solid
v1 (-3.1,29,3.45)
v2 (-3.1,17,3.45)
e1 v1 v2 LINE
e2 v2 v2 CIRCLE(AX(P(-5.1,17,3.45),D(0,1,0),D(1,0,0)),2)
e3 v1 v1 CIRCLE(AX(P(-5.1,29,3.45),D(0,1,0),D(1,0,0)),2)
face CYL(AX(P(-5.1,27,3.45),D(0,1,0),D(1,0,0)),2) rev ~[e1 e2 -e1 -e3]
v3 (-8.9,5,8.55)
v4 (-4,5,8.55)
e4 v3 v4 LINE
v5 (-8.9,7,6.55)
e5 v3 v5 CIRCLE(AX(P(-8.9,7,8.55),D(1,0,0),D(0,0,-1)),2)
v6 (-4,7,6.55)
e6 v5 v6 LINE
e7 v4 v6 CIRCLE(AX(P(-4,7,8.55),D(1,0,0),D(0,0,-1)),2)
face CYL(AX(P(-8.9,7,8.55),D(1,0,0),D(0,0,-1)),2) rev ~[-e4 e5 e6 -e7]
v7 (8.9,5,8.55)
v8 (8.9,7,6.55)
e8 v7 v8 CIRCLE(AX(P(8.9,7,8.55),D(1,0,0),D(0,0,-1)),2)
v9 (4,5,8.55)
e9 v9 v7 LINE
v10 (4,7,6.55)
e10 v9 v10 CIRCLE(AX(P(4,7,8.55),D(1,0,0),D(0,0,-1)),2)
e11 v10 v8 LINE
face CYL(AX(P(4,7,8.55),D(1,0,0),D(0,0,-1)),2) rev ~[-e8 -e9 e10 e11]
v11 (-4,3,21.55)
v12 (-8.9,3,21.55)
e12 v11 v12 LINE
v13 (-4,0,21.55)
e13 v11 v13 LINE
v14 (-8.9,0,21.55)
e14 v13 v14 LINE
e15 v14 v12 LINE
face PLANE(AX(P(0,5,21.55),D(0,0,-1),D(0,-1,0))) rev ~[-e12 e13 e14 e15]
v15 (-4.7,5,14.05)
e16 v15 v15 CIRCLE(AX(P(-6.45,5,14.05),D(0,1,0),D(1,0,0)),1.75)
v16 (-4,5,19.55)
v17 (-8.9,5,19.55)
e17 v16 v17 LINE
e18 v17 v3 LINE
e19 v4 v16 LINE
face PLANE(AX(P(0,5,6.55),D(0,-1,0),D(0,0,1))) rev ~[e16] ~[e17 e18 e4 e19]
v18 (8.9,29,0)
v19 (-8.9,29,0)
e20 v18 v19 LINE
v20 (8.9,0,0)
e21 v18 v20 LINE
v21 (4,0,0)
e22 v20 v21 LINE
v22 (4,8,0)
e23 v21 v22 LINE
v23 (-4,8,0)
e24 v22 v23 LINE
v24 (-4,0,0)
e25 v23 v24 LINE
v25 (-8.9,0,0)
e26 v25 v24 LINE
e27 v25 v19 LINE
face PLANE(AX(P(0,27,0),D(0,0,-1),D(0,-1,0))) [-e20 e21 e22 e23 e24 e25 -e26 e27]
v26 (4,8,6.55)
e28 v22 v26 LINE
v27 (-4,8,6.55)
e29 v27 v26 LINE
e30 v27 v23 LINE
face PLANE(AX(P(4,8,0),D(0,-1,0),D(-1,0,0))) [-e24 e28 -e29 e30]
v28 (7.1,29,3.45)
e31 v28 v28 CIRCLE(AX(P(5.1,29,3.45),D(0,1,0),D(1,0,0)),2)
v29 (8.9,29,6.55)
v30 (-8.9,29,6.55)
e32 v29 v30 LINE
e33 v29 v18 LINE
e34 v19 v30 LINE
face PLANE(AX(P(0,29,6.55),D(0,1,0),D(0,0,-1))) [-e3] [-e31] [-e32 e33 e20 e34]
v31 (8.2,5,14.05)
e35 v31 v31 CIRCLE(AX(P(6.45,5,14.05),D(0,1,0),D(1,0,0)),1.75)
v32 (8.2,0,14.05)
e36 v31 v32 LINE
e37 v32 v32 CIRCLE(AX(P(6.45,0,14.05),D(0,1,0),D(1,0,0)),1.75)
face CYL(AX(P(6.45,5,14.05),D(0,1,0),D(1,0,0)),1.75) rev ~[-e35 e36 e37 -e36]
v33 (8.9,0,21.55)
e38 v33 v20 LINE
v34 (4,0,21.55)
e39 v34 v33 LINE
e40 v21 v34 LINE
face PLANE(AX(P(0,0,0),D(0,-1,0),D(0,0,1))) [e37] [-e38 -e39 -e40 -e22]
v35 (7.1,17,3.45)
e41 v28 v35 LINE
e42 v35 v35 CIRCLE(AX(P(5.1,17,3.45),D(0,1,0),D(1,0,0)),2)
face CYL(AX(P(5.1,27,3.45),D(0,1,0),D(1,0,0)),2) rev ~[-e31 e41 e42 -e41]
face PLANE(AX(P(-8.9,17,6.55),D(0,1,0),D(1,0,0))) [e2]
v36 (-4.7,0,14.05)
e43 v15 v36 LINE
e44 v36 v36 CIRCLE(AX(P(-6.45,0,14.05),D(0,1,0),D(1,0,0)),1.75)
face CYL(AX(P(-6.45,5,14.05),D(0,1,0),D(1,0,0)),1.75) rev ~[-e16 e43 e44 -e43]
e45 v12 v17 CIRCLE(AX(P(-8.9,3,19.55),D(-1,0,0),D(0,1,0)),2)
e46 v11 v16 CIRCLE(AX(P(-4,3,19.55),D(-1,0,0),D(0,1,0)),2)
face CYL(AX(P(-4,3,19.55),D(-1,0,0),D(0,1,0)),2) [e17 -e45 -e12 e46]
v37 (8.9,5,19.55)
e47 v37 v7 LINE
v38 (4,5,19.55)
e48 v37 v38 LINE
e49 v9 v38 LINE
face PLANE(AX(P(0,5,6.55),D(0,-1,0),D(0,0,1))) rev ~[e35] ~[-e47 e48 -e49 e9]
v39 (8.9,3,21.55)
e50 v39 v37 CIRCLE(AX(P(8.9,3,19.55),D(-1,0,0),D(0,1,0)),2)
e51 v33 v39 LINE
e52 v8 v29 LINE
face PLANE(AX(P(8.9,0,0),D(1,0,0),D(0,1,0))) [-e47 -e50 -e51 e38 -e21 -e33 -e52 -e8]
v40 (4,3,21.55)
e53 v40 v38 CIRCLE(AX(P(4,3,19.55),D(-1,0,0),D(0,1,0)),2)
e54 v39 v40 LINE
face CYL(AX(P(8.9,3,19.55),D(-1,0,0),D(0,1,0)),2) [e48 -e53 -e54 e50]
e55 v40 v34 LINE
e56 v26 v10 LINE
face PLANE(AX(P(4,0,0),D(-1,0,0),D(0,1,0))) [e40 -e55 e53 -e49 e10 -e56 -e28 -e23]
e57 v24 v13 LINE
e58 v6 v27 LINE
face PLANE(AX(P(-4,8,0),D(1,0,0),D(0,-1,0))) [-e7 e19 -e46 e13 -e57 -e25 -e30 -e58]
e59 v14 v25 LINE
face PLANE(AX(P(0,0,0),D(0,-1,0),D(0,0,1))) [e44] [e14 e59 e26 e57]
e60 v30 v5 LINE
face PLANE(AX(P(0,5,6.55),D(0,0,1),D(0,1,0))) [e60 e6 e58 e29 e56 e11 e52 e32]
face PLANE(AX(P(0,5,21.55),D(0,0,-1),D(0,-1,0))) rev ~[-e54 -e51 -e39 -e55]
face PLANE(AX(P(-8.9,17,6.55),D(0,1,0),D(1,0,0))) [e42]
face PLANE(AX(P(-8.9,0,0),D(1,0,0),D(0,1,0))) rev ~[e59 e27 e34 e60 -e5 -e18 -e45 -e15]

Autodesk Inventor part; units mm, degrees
ref_plane "YZ Plane" through (0, 0, 0) normal (1, 0, 0) x (0, 1, 0)
ref_plane "XZ Plane" through (0, 0, 0) normal (0, 1, 0) x (-1, 0, 0)
ref_plane "XY Plane" through (0, 0, 0) normal (0, 0, 1) x (1, 0, 0)
sketch "Boceto1" plane through (0, 0, 0) normal (1, 0, 0) x (0, 1, 0)
  line L0 (27, 0) -> (0, 0)
  line L1 (0, 0) -> (0, 6.55)
  line L2 (0, 6.55) -> (27, 6.55)
  line L3 (27, 6.55) -> (27, 0)
  line L4 (0, 6.55) -> (5, 6.55)
  line L5 (5, 6.55) -> (5, 21.55)
  line L6 (5, 21.55) -> (0, 21.55)
  line L7 (0, 21.55) -> (0, 6.55)
  dimension "d0" = 27
  dimension "d1" = 6.55
  dimension "d2" = 15
  dimension "d3" = 5
extrude "Extrusión1" add sketch "Boceto1" along normal mid plane 17.8
sketch "Boceto3" plane through (8.9, 27, 0) normal (0, 0, -1) x (-1, 0, 0)
  line L0 (4.9, -19) -> (12.9, -19)
  line L1 (12.9, -19) -> (12.9, -27)
  line L2 (12.9, -27) -> (4.9, -27)
  line L3 (4.9, -27) -> (4.9, -19)
  line L4 (0, -27) -> (17.8, -27) projected
  point P0 (8.9, -27)
  point P1 (8.9, -27)
  dimension "d6" = 8
  dimension "d7" = 8
extrude "Extrusión2" cut sketch "Boceto3" against normal through all
sketch "Boceto4" plane through (-8.9, 5, 21.55) normal (0, 1, 0) x (1, 0, 0)
  point P0 (8.9, 21.55)
sketch "Boceto5" plane through (-8.9, 27, 6.55) normal (0, 1, 0) x (1, 0, 0)
  circle A0 centre (3.8, 3.1) radius 2
  circle A1 centre (14, 3.1) radius 2
  line L0 (0, 0) -> (0, 6.55) projected
  line L1 (0, 0) -> (17.8, 0) projected
  line L2 (17.8, 6.55) -> (17.8, 0) projected
  point P0 (8.9, 6.55)
  dimension "d10" = 4
  dimension "d11" = 4
  dimension "d12" = 3.8
  dimension "d13" = 3.1
  dimension "d14" = 3.8
extrude "Extrusión3" cut sketch "Boceto5" against normal blind 10
sketch "Boceto6" plane through (-8.9, 5, 21.55) normal (0, 1, 0) x (1, 0, 0)
  circle A0 centre (2.45, 7.5) radius 1.75
  circle A1 centre (15.35, 7.5) radius 1.75
  line L0 (0, 0) -> (4.9, 0) projected
  line L1 (0, 15) -> (17.8, 15) projected
  line L2 (12.9, 0) -> (17.8, 0) projected
  point P0 (8.9, 21.55)
  point P1 (2.45, 0)
  point P2 (15.35, 0)
  dimension "d17" = 3.5
  dimension "d18" = 3.5
  dimension "d19" = 15
  dimension "d20" = 7.5
  dimension "d21" = 7.5
extrude "Extrusión4" cut sketch "Boceto6" against normal through all
fillet "Empalme1" radius 2 2 edges at (-6.45, 5, 6.55) (6.45, 5, 6.55)
fillet "Empalme2" radius 2 2 edges at (-6.45, 5, 21.55) (6.45, 5, 21.55)
move faces "Desplazar1" translate (0, 2, 0) faces at (1.6196, 27, 0.4882)
equation "\"d11\" = d10"
equation "\"d14\" = d12"
equation "\"d20\" = 0.5 * d19"
equation "\"d21\" = d20"
properties part number "Sujeción de servo a mesa" material "Plástico PC/ABS"
